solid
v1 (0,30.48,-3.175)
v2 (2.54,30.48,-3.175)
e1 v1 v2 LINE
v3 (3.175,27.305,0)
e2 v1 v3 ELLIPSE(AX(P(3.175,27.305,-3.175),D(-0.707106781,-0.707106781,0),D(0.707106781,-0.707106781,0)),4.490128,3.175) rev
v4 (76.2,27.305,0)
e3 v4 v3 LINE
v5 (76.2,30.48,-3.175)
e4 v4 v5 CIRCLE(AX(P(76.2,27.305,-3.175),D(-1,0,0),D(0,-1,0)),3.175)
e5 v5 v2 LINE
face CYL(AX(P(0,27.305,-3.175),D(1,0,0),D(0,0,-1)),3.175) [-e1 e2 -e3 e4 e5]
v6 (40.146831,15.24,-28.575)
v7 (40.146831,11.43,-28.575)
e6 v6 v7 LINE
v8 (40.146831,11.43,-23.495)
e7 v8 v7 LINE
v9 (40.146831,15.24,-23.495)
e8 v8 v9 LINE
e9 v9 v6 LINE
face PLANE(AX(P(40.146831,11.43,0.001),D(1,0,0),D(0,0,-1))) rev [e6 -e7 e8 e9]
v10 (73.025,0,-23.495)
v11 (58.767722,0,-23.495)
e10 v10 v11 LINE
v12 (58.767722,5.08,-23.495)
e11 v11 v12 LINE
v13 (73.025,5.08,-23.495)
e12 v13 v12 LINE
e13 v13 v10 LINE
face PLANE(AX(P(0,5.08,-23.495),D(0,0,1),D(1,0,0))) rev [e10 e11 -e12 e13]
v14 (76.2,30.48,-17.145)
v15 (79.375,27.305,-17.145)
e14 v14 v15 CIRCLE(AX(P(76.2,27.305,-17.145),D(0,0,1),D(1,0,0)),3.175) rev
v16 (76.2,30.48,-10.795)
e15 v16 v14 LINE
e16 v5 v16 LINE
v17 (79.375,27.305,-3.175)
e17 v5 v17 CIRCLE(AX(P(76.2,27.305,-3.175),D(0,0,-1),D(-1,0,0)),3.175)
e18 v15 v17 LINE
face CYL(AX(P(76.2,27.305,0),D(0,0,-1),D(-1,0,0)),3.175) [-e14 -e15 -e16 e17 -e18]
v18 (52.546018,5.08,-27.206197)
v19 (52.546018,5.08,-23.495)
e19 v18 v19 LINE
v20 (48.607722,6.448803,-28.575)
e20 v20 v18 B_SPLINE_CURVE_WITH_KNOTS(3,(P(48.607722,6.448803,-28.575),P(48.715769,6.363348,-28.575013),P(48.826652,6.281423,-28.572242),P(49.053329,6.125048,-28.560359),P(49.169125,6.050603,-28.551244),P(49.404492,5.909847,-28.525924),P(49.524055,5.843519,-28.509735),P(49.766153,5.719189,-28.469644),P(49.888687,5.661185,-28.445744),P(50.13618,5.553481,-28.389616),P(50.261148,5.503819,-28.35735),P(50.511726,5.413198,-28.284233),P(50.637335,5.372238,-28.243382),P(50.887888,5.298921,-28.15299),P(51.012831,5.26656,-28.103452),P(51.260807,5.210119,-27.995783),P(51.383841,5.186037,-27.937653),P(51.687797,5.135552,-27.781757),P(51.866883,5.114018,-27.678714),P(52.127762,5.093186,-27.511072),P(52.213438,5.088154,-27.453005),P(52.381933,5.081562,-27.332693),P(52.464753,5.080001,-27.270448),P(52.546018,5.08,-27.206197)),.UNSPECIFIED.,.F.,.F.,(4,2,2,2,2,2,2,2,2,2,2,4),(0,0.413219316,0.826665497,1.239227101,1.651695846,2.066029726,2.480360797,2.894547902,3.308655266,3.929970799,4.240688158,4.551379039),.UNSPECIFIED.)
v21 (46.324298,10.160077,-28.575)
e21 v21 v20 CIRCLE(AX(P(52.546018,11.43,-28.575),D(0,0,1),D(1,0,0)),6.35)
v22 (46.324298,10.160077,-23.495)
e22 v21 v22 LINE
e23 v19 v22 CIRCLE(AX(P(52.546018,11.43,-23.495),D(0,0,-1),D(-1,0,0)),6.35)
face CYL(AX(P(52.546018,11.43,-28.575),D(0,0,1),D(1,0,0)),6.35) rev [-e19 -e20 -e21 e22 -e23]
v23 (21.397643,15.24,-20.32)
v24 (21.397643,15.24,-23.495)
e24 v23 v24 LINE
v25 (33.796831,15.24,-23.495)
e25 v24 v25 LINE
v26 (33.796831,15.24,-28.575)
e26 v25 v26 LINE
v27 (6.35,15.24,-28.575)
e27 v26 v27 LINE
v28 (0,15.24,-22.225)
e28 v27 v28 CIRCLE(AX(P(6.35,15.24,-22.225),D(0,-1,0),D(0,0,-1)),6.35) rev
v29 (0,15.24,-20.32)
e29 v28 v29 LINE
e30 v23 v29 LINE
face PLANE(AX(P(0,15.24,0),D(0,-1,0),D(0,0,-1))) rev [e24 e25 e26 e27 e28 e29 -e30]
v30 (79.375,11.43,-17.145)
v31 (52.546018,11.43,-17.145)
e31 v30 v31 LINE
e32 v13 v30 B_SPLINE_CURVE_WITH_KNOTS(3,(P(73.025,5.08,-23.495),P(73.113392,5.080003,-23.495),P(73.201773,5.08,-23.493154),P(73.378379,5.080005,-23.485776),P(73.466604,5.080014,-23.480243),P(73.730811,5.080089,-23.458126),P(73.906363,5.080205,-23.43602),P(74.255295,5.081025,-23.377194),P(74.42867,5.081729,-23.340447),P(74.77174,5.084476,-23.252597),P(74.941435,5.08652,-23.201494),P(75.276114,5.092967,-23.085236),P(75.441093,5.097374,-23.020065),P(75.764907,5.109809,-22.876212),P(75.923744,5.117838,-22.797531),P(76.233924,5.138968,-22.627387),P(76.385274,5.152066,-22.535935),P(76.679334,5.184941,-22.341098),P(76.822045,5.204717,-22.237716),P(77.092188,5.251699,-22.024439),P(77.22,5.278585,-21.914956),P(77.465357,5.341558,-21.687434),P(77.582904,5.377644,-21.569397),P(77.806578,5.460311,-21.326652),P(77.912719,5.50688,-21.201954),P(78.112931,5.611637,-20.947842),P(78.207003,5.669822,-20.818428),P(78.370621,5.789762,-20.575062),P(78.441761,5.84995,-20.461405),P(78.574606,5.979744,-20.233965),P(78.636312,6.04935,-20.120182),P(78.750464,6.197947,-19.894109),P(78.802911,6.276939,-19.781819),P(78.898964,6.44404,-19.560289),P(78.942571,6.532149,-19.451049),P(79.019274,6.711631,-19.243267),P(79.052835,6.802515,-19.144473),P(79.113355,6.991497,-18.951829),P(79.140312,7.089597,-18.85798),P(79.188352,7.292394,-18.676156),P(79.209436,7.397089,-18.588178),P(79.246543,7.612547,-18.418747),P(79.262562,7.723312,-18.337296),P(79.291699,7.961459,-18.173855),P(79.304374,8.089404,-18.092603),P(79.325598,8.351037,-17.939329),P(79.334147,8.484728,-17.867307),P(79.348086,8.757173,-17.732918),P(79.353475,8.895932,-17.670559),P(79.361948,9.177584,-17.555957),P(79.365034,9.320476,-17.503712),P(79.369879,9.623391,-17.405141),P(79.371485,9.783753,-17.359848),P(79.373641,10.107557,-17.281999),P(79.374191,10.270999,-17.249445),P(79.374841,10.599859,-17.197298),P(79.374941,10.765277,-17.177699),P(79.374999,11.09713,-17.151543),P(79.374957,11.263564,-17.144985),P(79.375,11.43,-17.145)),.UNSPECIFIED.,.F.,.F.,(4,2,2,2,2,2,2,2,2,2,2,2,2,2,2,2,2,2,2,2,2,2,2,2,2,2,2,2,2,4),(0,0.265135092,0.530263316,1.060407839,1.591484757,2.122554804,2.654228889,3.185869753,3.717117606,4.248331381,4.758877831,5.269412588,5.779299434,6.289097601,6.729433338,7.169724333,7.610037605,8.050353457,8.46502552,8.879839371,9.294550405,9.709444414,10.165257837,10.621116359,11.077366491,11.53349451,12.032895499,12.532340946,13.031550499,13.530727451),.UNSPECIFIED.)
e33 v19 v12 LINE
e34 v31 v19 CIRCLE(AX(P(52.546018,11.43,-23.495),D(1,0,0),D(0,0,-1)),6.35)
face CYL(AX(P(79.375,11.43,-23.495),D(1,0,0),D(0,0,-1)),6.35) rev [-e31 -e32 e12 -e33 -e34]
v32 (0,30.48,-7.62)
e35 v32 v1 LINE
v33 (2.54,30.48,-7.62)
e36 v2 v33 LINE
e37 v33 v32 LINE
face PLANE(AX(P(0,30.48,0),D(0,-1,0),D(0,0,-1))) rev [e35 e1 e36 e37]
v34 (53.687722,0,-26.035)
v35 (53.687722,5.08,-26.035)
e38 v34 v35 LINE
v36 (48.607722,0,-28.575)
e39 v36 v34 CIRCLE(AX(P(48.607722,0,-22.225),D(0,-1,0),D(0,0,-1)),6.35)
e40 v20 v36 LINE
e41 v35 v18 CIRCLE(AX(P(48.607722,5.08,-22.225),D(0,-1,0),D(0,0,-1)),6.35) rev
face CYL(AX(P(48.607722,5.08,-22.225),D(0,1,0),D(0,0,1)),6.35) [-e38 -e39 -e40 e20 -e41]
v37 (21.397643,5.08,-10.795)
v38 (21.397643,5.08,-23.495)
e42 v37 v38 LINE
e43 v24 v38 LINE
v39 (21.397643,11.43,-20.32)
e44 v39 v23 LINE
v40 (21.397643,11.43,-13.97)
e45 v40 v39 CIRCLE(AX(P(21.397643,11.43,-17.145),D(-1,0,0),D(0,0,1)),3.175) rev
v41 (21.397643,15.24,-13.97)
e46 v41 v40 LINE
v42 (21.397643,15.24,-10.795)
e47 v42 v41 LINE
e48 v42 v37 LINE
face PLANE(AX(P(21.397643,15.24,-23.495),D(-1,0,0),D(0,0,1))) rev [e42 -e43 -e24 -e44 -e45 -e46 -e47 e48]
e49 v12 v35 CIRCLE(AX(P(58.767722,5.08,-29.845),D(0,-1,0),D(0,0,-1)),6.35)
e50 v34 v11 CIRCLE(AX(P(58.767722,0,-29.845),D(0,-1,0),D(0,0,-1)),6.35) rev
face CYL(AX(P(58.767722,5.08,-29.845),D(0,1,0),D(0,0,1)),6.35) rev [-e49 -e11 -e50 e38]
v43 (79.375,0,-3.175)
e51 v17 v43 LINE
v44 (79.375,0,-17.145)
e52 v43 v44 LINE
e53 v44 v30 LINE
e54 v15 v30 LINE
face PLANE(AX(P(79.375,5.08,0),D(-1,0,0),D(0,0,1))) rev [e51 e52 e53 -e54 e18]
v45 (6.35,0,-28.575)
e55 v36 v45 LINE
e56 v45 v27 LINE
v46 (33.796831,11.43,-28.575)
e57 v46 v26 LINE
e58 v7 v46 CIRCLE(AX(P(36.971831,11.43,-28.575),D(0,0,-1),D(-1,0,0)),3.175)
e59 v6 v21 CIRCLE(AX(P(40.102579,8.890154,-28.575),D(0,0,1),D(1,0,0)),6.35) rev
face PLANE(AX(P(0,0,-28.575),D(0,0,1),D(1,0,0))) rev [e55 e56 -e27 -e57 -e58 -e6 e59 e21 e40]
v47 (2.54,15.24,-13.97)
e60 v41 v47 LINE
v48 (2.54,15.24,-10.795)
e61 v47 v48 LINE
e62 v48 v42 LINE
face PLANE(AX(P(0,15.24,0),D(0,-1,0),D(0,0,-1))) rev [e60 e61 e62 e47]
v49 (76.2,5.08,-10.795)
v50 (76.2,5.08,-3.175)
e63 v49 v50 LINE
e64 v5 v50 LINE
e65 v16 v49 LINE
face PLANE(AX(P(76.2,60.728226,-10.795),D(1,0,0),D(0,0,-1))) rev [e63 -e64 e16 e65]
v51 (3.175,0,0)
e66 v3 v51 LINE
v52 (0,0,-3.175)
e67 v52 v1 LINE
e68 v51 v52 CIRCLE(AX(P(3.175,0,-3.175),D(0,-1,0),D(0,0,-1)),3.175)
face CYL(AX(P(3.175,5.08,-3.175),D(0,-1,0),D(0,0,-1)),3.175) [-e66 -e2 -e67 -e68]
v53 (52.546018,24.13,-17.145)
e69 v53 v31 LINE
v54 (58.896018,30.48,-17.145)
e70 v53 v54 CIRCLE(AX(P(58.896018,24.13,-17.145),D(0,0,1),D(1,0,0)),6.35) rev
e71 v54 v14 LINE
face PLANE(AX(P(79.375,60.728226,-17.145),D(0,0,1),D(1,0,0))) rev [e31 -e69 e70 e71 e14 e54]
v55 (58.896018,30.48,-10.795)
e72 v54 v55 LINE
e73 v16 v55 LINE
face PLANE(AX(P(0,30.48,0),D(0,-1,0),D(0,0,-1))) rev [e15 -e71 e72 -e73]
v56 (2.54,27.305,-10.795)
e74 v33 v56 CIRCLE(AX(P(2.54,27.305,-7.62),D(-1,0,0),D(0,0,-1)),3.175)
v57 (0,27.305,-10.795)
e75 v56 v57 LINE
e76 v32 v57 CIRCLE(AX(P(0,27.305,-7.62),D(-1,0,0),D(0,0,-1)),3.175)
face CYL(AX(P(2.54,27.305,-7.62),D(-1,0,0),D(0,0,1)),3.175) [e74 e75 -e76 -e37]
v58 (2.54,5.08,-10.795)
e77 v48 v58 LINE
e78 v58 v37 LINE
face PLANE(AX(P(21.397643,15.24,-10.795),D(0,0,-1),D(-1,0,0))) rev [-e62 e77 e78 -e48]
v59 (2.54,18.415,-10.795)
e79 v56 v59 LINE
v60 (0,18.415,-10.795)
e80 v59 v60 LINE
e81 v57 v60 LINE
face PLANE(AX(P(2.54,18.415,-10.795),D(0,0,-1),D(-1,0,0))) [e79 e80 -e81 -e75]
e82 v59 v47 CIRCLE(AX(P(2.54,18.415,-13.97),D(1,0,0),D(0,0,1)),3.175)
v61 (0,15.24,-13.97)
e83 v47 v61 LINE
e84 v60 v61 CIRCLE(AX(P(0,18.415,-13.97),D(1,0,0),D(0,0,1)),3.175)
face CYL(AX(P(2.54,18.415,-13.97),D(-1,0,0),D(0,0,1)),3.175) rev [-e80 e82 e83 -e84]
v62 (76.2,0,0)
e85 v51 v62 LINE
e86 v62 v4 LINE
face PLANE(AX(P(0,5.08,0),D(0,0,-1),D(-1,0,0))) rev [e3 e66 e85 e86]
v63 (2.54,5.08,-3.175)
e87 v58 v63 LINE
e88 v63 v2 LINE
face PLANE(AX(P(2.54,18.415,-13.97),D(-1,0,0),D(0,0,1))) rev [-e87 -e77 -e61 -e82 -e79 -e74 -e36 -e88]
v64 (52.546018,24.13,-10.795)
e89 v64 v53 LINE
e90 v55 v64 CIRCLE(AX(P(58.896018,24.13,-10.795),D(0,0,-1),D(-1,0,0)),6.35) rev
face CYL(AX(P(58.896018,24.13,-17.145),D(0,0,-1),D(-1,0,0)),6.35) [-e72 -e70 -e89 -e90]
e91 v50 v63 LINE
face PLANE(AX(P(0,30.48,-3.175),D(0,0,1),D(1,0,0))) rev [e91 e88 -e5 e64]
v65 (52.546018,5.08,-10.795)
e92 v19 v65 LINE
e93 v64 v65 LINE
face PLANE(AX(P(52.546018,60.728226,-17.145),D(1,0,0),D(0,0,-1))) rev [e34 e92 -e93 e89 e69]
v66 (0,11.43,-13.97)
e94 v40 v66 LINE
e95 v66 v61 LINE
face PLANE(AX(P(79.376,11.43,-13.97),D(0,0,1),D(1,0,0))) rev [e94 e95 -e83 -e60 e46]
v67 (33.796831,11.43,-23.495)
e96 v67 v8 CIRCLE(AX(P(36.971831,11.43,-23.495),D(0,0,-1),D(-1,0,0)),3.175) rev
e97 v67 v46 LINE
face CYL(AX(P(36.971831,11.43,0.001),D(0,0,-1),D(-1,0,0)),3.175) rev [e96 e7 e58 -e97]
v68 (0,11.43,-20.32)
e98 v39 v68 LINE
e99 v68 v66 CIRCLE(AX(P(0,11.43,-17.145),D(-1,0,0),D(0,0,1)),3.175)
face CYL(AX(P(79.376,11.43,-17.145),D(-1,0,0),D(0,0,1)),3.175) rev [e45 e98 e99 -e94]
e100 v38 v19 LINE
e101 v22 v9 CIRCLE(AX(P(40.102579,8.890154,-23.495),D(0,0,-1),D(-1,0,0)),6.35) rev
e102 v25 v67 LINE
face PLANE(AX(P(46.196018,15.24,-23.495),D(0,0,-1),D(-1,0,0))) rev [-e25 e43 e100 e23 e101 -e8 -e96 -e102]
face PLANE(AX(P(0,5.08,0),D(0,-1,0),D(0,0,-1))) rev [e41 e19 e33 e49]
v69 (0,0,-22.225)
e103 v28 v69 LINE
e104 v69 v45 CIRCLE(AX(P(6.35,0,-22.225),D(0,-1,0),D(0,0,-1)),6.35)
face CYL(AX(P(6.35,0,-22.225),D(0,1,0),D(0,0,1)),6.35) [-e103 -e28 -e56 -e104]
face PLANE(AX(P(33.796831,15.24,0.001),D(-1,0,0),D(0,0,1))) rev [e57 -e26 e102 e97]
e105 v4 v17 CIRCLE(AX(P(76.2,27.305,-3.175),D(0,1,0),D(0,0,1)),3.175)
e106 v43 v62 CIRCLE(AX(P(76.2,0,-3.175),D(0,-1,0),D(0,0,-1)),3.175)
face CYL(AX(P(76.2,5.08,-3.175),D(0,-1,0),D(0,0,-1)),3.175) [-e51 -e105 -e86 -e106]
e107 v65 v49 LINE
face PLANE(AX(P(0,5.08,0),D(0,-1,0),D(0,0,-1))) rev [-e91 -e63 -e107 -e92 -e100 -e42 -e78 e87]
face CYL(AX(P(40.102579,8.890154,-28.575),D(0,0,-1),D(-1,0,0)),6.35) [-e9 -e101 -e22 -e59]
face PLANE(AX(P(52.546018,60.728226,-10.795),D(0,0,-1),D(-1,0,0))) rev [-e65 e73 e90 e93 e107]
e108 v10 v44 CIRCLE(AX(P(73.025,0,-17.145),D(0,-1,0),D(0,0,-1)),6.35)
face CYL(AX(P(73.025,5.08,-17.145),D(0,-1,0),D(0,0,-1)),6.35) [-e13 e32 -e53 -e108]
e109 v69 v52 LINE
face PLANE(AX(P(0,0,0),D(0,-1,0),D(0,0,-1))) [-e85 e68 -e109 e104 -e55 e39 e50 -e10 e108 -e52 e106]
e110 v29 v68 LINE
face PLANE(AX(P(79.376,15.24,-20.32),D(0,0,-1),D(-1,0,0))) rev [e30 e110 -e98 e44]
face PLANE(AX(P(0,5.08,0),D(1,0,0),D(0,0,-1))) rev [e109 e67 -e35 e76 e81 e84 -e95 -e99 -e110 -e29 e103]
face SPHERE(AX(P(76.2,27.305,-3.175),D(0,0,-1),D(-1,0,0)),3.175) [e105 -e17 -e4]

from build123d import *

# Parameters (mm, degrees)
SKETCH1_W           = 79.375
SKETCH1_H           = 23.495
BOSS_EXTRUDE1_DEPTH = 5.08
SKETCH2_W           = 79.375
SKETCH2_H           = 3.175
BOSS_EXTRUDE2_DEPTH = 25.4
SKETCH3_W           = 52.546018004
SKETCH3_H           = 5.08
BOSS_EXTRUDE3_DEPTH = 5.08
BOSS_EXTRUDE4_DEPTH = 10.16
CUT_EXTRUDE1_REACH  = 91.699
CUT_EXTRUDE2_REACH  = 91.699
FILLET2_R           = 6.35
FILLET3_R           = 6.35
FILLET4_R           = 6.35
FILLET5_R           = 6.35
BOSS_EXTRUDE6_DEPTH = 2.54
BOSS_EXTRUDE7_DEPTH = 25.4
FILLET6_R           = 6.35
FILLET7_START       = 52.546018004
FILLET7_DEPTH       = 26.828981996
FILLET7_START_2     = 5.08
FILLET7_2_DEPTH     = 6.92
FILLET8_START       = -18
FILLET8_DEPTH       = 19
FILLET9_R           = 3.175


with BuildPart() as part:
    # Sketch1 → Boss-Extrude1 (new body)
    with BuildSketch(Plane(origin=(0, 0, 0), x_dir=(1, 0, 0), z_dir=(0, 1, 0))):
        with Locations((39.6875, 11.7475)):
            Rectangle(SKETCH1_W, SKETCH1_H)
    extrude(amount=BOSS_EXTRUDE1_DEPTH)

    # Sketch2 → Boss-Extrude2 (add)
    with BuildSketch(Plane(origin=(0, 5.08, 0), x_dir=(1, 0, 0), z_dir=(0, 1, 0))):
        with Locations((39.6875, 1.5875)):
            Rectangle(SKETCH2_W, SKETCH2_H)
    extrude(amount=BOSS_EXTRUDE2_DEPTH)

    # Sketch3 → Boss-Extrude3 (add)
    with BuildSketch(Plane(origin=(0, 0, -23.495), x_dir=(-1, 0, 0), z_dir=(0, 0, -1))):
        with Locations((-26.273009002, 2.54)):
            Rectangle(SKETCH3_W, SKETCH3_H)
    extrude(amount=BOSS_EXTRUDE3_DEPTH)

    # Sketch4 → Boss-Extrude4 (add)
    with BuildSketch(Plane(origin=(0, 5.08, 0), x_dir=(1, 0, 0), z_dir=(0, 1, 0))):
        Polygon((46.196018004, 28.575), (0, 28.575), (0, 10.795), (21.397643113, 10.795), (21.397643113, 23.495), (46.196018004, 23.495), align=None)
    extrude(amount=BOSS_EXTRUDE4_DEPTH)

    # Sketch7 → Cut-Extrude1 (cut, up to next)
    with BuildSketch(Plane(origin=(0, 0, -28.575), x_dir=(-1, 0, 0), z_dir=(0, 0, -1)), mode=Mode.PRIVATE) as cut_extrude1_sk1:
        with BuildLine():
            Line((-40.146830558, 11.43), (-40.146830558, 15.24))
            Line((-40.146830558, 15.24), (-33.796830558, 15.24))
            Line((-33.796830558, 15.24), (-33.796830558, 11.43))
            ThreePointArc((-33.796830558, 11.43), (-36.971830558, 8.255), (-40.146830558, 11.43))
        make_face()
    cut_extrude1_tool1 = extrude(cut_extrude1_sk1.sketch, amount=-CUT_EXTRUDE1_REACH, mode=Mode.PRIVATE) & part.part
    add(cut_extrude1_tool1.solids().sort_by_distance((36.971831, 12.048348, -28.575))[0], mode=Mode.SUBTRACT)

    # Sketch8 → Cut-Extrude2 (cut, up to next)
    with BuildSketch(Plane.ZY, mode=Mode.PRIVATE) as cut_extrude2_sk1:
        with BuildLine():
            Line((-13.97, 11.43), (-13.97, 15.24))
            Line((-13.97, 15.24), (-20.32, 15.24))
            Line((-20.32, 15.24), (-20.32, 11.43))
            ThreePointArc((-20.32, 11.43), (-17.145, 8.255), (-13.97, 11.43))
        make_face()
    cut_extrude2_tool1 = extrude(cut_extrude2_sk1.sketch, amount=-CUT_EXTRUDE2_REACH, mode=Mode.PRIVATE) & part.part
    add(cut_extrude2_tool1.solids().sort_by_distance((0, 12.048348, -17.145))[0], mode=Mode.SUBTRACT)

    # Fillet2
    # the kernel refuses this fillet: 6.35 mm, written as the material it adds along each edge
    with BuildSketch(Plane(origin=(52.546018004, 5.08, -23.495), x_dir=(1, 0, 0), z_dir=(0, -1, 0))) as fillet2_piece_1:
        with BuildLine():
            CenterArc((6.221703947, -6.35), FILLET2_R, 90, 78.463040967)
            Line((0, -5.08), (0, 0))
            Line((0, 0), (6.221703947, 0))
        make_face()
    extrude(amount=5.08)
    # the kernel refuses this fillet: 6.35 mm, written as the material it takes off along each edge
    with BuildSketch(Plane(origin=(0, 31.115, -28.575), x_dir=(0, 0, 1), z_dir=(0, -1, 0))) as fillet2_2_piece_1:
        with BuildLine():
            CenterArc((FILLET2_R, -FILLET2_R), FILLET2_R, 90, 90)
            Line((0, -FILLET2_R), (0, 0))
            Line((0, 0), (FILLET2_R, 0))
        make_face()
    extrude(amount=46.99, mode=Mode.SUBTRACT)
    with BuildSketch(Plane(origin=(79.375, -15.875, -23.495), x_dir=(0, 0, 1), z_dir=(0, 1, 0))) as fillet2_2_piece_2:
        with BuildLine():
            CenterArc((FILLET2_R, -FILLET2_R), FILLET2_R, 90, 90)
            Line((0, -FILLET2_R), (0, 0))
            Line((0, 0), (FILLET2_R, 0))
        make_face()
    extrude(amount=36.83, mode=Mode.SUBTRACT)

    # Fillet3
    fillet3_edges = [part.edges().sort_by_distance(p)[0] for p in [
        (52.546018004, 2.54, -28.575),
    ]]
    fillet(fillet3_edges, radius=FILLET3_R)

    # Fillet4
    fillet4_edges = [part.edges().sort_by_distance(p)[0] for p in [
        (46.196018004, 5.08, -26.035),
    ]]
    fillet(fillet4_edges, radius=FILLET4_R)

    # Fillet5
    # the kernel refuses this fillet: 6.35 mm, written as the material it takes off along each edge
    with BuildSketch(Plane(origin=(46.196018004, 15.24, -8.261480267), x_dir=(-1, 0, 0), z_dir=(0, 0, -1))) as fillet5_piece_1:
        with BuildLine():
            CenterArc((6.093407893, -6.35), FILLET5_R, 90, 78.463040967)
            Line((-0.128296053, -5.08), (-0.750466448, -4.953))
            ThreePointArc((-0.750466448, -4.953), (-0.635, -3.81), (-0.635, 0))
            Line((-0.635, 0), (0, 0.635))
            Line((0, 0.635), (6.093407893, 0.635))
            Line((6.093407893, 0.635), (6.093407893, 0))
        make_face()
    extrude(amount=35.547039467, mode=Mode.SUBTRACT)

    # Sketch10 → Boss-Extrude6 (add)
    with BuildSketch(Plane.ZY):
        with BuildLine():
            Line((-3.175, 5.08), (-10.795, 5.08))
            Line((-10.795, 5.08), (-10.795, 15.24))
            Line((-10.795, 15.24), (-13.97, 15.24))
            ThreePointArc((-13.97, 15.24), (-11.72493597, 16.16993597), (-10.795, 18.415))
            Line((-10.795, 18.415), (-10.795, 27.305))
            ThreePointArc((-10.795, 27.305), (-9.86506403, 29.55006403), (-7.62, 30.48))
            Line((-7.62, 30.48), (-3.175, 30.48))
            Line((-3.175, 30.48), (-3.175, 5.08))
        make_face()
    extrude(amount=-BOSS_EXTRUDE6_DEPTH)

    # Sketch11 → Boss-Extrude7 (add)
    with BuildSketch(Plane(origin=(0, 5.08, 0), x_dir=(1, 0, 0), z_dir=(0, 1, 0))):
        Polygon((79.375, 3.175), (79.375, 17.145), (52.546018004, 17.145), (52.546018004, 10.795), (76.2, 10.795), (76.2, 3.175), align=None)
    extrude(amount=BOSS_EXTRUDE7_DEPTH)

    # Fillet6
    fillet6_edges = [part.edges().sort_by_distance(p)[0] for p in [
        (52.546018004, 30.48, -13.97),
    ]]
    fillet(fillet6_edges, radius=FILLET6_R)

    # Fillet7: read off the stored shape, not the designer's step
    # Fillet7 outline → Fillet7 (add)
    with BuildSketch(Plane.YZ.offset(FILLET7_START)):
        with BuildLine():
            ThreePointArc((5.08, -23.495), (6.939871939, -19.004871939), (11.43, -17.145))
            Line((11.43, -17.145), (5.08, -17.145))
            Line((5.08, -17.145), (5.08, -23.495))
        make_face()
    extrude(amount=FILLET7_DEPTH)

    # Fillet7 2 outline → Fillet7 2 (cut)
    with BuildSketch(Plane(origin=(0, 0, 0), x_dir=(1, 0, 0), z_dir=(0, 1, 0)).offset(FILLET7_START_2)):
        with BuildLine():
            Line((72, 23.495), (73.025, 23.495))
            ThreePointArc((73.025, 23.495), (77.515129122, 21.635126999), (79.375, 17.144996999))
            Line((79.375, 17.144996999), (79.374999459, 16))
            Line((79.374999459, 16), (81, 16))
            Line((81, 16), (81, 25))
            Line((81, 25), (72, 25))
            Line((72, 25), (72, 23.495))
        make_face()
    extrude(amount=FILLET7_2_DEPTH, mode=Mode.SUBTRACT)

    # Fillet8: read off the stored shape, not the designer's step
    # Fillet8 outline → Fillet8 (cut)
    with BuildSketch(Plane.XY.offset(FILLET8_START)):
        with BuildLine():
            Line((79.375, 30.48), (76.2, 30.48))
            ThreePointArc((76.2, 30.48), (78.44506403, 29.55006403), (79.375, 27.305))
            Line((79.375, 27.305), (79.375, 30.48))
        make_face()
    extrude(amount=FILLET8_DEPTH, mode=Mode.SUBTRACT)

    # Fillet9
    fillet9_edges = [part.edges().sort_by_distance(p)[0] for p in [
        (38.1, 30.48, 0),
        (79.375, 13.6525, 0),
        (0, 15.24, 0),
        (78.44506403, 29.55006403, 0),
    ]]
    fillet(fillet9_edges, radius=FILLET9_R - 0.0001)  # a hair under: the kernel refuses the full size


solid = part.part
